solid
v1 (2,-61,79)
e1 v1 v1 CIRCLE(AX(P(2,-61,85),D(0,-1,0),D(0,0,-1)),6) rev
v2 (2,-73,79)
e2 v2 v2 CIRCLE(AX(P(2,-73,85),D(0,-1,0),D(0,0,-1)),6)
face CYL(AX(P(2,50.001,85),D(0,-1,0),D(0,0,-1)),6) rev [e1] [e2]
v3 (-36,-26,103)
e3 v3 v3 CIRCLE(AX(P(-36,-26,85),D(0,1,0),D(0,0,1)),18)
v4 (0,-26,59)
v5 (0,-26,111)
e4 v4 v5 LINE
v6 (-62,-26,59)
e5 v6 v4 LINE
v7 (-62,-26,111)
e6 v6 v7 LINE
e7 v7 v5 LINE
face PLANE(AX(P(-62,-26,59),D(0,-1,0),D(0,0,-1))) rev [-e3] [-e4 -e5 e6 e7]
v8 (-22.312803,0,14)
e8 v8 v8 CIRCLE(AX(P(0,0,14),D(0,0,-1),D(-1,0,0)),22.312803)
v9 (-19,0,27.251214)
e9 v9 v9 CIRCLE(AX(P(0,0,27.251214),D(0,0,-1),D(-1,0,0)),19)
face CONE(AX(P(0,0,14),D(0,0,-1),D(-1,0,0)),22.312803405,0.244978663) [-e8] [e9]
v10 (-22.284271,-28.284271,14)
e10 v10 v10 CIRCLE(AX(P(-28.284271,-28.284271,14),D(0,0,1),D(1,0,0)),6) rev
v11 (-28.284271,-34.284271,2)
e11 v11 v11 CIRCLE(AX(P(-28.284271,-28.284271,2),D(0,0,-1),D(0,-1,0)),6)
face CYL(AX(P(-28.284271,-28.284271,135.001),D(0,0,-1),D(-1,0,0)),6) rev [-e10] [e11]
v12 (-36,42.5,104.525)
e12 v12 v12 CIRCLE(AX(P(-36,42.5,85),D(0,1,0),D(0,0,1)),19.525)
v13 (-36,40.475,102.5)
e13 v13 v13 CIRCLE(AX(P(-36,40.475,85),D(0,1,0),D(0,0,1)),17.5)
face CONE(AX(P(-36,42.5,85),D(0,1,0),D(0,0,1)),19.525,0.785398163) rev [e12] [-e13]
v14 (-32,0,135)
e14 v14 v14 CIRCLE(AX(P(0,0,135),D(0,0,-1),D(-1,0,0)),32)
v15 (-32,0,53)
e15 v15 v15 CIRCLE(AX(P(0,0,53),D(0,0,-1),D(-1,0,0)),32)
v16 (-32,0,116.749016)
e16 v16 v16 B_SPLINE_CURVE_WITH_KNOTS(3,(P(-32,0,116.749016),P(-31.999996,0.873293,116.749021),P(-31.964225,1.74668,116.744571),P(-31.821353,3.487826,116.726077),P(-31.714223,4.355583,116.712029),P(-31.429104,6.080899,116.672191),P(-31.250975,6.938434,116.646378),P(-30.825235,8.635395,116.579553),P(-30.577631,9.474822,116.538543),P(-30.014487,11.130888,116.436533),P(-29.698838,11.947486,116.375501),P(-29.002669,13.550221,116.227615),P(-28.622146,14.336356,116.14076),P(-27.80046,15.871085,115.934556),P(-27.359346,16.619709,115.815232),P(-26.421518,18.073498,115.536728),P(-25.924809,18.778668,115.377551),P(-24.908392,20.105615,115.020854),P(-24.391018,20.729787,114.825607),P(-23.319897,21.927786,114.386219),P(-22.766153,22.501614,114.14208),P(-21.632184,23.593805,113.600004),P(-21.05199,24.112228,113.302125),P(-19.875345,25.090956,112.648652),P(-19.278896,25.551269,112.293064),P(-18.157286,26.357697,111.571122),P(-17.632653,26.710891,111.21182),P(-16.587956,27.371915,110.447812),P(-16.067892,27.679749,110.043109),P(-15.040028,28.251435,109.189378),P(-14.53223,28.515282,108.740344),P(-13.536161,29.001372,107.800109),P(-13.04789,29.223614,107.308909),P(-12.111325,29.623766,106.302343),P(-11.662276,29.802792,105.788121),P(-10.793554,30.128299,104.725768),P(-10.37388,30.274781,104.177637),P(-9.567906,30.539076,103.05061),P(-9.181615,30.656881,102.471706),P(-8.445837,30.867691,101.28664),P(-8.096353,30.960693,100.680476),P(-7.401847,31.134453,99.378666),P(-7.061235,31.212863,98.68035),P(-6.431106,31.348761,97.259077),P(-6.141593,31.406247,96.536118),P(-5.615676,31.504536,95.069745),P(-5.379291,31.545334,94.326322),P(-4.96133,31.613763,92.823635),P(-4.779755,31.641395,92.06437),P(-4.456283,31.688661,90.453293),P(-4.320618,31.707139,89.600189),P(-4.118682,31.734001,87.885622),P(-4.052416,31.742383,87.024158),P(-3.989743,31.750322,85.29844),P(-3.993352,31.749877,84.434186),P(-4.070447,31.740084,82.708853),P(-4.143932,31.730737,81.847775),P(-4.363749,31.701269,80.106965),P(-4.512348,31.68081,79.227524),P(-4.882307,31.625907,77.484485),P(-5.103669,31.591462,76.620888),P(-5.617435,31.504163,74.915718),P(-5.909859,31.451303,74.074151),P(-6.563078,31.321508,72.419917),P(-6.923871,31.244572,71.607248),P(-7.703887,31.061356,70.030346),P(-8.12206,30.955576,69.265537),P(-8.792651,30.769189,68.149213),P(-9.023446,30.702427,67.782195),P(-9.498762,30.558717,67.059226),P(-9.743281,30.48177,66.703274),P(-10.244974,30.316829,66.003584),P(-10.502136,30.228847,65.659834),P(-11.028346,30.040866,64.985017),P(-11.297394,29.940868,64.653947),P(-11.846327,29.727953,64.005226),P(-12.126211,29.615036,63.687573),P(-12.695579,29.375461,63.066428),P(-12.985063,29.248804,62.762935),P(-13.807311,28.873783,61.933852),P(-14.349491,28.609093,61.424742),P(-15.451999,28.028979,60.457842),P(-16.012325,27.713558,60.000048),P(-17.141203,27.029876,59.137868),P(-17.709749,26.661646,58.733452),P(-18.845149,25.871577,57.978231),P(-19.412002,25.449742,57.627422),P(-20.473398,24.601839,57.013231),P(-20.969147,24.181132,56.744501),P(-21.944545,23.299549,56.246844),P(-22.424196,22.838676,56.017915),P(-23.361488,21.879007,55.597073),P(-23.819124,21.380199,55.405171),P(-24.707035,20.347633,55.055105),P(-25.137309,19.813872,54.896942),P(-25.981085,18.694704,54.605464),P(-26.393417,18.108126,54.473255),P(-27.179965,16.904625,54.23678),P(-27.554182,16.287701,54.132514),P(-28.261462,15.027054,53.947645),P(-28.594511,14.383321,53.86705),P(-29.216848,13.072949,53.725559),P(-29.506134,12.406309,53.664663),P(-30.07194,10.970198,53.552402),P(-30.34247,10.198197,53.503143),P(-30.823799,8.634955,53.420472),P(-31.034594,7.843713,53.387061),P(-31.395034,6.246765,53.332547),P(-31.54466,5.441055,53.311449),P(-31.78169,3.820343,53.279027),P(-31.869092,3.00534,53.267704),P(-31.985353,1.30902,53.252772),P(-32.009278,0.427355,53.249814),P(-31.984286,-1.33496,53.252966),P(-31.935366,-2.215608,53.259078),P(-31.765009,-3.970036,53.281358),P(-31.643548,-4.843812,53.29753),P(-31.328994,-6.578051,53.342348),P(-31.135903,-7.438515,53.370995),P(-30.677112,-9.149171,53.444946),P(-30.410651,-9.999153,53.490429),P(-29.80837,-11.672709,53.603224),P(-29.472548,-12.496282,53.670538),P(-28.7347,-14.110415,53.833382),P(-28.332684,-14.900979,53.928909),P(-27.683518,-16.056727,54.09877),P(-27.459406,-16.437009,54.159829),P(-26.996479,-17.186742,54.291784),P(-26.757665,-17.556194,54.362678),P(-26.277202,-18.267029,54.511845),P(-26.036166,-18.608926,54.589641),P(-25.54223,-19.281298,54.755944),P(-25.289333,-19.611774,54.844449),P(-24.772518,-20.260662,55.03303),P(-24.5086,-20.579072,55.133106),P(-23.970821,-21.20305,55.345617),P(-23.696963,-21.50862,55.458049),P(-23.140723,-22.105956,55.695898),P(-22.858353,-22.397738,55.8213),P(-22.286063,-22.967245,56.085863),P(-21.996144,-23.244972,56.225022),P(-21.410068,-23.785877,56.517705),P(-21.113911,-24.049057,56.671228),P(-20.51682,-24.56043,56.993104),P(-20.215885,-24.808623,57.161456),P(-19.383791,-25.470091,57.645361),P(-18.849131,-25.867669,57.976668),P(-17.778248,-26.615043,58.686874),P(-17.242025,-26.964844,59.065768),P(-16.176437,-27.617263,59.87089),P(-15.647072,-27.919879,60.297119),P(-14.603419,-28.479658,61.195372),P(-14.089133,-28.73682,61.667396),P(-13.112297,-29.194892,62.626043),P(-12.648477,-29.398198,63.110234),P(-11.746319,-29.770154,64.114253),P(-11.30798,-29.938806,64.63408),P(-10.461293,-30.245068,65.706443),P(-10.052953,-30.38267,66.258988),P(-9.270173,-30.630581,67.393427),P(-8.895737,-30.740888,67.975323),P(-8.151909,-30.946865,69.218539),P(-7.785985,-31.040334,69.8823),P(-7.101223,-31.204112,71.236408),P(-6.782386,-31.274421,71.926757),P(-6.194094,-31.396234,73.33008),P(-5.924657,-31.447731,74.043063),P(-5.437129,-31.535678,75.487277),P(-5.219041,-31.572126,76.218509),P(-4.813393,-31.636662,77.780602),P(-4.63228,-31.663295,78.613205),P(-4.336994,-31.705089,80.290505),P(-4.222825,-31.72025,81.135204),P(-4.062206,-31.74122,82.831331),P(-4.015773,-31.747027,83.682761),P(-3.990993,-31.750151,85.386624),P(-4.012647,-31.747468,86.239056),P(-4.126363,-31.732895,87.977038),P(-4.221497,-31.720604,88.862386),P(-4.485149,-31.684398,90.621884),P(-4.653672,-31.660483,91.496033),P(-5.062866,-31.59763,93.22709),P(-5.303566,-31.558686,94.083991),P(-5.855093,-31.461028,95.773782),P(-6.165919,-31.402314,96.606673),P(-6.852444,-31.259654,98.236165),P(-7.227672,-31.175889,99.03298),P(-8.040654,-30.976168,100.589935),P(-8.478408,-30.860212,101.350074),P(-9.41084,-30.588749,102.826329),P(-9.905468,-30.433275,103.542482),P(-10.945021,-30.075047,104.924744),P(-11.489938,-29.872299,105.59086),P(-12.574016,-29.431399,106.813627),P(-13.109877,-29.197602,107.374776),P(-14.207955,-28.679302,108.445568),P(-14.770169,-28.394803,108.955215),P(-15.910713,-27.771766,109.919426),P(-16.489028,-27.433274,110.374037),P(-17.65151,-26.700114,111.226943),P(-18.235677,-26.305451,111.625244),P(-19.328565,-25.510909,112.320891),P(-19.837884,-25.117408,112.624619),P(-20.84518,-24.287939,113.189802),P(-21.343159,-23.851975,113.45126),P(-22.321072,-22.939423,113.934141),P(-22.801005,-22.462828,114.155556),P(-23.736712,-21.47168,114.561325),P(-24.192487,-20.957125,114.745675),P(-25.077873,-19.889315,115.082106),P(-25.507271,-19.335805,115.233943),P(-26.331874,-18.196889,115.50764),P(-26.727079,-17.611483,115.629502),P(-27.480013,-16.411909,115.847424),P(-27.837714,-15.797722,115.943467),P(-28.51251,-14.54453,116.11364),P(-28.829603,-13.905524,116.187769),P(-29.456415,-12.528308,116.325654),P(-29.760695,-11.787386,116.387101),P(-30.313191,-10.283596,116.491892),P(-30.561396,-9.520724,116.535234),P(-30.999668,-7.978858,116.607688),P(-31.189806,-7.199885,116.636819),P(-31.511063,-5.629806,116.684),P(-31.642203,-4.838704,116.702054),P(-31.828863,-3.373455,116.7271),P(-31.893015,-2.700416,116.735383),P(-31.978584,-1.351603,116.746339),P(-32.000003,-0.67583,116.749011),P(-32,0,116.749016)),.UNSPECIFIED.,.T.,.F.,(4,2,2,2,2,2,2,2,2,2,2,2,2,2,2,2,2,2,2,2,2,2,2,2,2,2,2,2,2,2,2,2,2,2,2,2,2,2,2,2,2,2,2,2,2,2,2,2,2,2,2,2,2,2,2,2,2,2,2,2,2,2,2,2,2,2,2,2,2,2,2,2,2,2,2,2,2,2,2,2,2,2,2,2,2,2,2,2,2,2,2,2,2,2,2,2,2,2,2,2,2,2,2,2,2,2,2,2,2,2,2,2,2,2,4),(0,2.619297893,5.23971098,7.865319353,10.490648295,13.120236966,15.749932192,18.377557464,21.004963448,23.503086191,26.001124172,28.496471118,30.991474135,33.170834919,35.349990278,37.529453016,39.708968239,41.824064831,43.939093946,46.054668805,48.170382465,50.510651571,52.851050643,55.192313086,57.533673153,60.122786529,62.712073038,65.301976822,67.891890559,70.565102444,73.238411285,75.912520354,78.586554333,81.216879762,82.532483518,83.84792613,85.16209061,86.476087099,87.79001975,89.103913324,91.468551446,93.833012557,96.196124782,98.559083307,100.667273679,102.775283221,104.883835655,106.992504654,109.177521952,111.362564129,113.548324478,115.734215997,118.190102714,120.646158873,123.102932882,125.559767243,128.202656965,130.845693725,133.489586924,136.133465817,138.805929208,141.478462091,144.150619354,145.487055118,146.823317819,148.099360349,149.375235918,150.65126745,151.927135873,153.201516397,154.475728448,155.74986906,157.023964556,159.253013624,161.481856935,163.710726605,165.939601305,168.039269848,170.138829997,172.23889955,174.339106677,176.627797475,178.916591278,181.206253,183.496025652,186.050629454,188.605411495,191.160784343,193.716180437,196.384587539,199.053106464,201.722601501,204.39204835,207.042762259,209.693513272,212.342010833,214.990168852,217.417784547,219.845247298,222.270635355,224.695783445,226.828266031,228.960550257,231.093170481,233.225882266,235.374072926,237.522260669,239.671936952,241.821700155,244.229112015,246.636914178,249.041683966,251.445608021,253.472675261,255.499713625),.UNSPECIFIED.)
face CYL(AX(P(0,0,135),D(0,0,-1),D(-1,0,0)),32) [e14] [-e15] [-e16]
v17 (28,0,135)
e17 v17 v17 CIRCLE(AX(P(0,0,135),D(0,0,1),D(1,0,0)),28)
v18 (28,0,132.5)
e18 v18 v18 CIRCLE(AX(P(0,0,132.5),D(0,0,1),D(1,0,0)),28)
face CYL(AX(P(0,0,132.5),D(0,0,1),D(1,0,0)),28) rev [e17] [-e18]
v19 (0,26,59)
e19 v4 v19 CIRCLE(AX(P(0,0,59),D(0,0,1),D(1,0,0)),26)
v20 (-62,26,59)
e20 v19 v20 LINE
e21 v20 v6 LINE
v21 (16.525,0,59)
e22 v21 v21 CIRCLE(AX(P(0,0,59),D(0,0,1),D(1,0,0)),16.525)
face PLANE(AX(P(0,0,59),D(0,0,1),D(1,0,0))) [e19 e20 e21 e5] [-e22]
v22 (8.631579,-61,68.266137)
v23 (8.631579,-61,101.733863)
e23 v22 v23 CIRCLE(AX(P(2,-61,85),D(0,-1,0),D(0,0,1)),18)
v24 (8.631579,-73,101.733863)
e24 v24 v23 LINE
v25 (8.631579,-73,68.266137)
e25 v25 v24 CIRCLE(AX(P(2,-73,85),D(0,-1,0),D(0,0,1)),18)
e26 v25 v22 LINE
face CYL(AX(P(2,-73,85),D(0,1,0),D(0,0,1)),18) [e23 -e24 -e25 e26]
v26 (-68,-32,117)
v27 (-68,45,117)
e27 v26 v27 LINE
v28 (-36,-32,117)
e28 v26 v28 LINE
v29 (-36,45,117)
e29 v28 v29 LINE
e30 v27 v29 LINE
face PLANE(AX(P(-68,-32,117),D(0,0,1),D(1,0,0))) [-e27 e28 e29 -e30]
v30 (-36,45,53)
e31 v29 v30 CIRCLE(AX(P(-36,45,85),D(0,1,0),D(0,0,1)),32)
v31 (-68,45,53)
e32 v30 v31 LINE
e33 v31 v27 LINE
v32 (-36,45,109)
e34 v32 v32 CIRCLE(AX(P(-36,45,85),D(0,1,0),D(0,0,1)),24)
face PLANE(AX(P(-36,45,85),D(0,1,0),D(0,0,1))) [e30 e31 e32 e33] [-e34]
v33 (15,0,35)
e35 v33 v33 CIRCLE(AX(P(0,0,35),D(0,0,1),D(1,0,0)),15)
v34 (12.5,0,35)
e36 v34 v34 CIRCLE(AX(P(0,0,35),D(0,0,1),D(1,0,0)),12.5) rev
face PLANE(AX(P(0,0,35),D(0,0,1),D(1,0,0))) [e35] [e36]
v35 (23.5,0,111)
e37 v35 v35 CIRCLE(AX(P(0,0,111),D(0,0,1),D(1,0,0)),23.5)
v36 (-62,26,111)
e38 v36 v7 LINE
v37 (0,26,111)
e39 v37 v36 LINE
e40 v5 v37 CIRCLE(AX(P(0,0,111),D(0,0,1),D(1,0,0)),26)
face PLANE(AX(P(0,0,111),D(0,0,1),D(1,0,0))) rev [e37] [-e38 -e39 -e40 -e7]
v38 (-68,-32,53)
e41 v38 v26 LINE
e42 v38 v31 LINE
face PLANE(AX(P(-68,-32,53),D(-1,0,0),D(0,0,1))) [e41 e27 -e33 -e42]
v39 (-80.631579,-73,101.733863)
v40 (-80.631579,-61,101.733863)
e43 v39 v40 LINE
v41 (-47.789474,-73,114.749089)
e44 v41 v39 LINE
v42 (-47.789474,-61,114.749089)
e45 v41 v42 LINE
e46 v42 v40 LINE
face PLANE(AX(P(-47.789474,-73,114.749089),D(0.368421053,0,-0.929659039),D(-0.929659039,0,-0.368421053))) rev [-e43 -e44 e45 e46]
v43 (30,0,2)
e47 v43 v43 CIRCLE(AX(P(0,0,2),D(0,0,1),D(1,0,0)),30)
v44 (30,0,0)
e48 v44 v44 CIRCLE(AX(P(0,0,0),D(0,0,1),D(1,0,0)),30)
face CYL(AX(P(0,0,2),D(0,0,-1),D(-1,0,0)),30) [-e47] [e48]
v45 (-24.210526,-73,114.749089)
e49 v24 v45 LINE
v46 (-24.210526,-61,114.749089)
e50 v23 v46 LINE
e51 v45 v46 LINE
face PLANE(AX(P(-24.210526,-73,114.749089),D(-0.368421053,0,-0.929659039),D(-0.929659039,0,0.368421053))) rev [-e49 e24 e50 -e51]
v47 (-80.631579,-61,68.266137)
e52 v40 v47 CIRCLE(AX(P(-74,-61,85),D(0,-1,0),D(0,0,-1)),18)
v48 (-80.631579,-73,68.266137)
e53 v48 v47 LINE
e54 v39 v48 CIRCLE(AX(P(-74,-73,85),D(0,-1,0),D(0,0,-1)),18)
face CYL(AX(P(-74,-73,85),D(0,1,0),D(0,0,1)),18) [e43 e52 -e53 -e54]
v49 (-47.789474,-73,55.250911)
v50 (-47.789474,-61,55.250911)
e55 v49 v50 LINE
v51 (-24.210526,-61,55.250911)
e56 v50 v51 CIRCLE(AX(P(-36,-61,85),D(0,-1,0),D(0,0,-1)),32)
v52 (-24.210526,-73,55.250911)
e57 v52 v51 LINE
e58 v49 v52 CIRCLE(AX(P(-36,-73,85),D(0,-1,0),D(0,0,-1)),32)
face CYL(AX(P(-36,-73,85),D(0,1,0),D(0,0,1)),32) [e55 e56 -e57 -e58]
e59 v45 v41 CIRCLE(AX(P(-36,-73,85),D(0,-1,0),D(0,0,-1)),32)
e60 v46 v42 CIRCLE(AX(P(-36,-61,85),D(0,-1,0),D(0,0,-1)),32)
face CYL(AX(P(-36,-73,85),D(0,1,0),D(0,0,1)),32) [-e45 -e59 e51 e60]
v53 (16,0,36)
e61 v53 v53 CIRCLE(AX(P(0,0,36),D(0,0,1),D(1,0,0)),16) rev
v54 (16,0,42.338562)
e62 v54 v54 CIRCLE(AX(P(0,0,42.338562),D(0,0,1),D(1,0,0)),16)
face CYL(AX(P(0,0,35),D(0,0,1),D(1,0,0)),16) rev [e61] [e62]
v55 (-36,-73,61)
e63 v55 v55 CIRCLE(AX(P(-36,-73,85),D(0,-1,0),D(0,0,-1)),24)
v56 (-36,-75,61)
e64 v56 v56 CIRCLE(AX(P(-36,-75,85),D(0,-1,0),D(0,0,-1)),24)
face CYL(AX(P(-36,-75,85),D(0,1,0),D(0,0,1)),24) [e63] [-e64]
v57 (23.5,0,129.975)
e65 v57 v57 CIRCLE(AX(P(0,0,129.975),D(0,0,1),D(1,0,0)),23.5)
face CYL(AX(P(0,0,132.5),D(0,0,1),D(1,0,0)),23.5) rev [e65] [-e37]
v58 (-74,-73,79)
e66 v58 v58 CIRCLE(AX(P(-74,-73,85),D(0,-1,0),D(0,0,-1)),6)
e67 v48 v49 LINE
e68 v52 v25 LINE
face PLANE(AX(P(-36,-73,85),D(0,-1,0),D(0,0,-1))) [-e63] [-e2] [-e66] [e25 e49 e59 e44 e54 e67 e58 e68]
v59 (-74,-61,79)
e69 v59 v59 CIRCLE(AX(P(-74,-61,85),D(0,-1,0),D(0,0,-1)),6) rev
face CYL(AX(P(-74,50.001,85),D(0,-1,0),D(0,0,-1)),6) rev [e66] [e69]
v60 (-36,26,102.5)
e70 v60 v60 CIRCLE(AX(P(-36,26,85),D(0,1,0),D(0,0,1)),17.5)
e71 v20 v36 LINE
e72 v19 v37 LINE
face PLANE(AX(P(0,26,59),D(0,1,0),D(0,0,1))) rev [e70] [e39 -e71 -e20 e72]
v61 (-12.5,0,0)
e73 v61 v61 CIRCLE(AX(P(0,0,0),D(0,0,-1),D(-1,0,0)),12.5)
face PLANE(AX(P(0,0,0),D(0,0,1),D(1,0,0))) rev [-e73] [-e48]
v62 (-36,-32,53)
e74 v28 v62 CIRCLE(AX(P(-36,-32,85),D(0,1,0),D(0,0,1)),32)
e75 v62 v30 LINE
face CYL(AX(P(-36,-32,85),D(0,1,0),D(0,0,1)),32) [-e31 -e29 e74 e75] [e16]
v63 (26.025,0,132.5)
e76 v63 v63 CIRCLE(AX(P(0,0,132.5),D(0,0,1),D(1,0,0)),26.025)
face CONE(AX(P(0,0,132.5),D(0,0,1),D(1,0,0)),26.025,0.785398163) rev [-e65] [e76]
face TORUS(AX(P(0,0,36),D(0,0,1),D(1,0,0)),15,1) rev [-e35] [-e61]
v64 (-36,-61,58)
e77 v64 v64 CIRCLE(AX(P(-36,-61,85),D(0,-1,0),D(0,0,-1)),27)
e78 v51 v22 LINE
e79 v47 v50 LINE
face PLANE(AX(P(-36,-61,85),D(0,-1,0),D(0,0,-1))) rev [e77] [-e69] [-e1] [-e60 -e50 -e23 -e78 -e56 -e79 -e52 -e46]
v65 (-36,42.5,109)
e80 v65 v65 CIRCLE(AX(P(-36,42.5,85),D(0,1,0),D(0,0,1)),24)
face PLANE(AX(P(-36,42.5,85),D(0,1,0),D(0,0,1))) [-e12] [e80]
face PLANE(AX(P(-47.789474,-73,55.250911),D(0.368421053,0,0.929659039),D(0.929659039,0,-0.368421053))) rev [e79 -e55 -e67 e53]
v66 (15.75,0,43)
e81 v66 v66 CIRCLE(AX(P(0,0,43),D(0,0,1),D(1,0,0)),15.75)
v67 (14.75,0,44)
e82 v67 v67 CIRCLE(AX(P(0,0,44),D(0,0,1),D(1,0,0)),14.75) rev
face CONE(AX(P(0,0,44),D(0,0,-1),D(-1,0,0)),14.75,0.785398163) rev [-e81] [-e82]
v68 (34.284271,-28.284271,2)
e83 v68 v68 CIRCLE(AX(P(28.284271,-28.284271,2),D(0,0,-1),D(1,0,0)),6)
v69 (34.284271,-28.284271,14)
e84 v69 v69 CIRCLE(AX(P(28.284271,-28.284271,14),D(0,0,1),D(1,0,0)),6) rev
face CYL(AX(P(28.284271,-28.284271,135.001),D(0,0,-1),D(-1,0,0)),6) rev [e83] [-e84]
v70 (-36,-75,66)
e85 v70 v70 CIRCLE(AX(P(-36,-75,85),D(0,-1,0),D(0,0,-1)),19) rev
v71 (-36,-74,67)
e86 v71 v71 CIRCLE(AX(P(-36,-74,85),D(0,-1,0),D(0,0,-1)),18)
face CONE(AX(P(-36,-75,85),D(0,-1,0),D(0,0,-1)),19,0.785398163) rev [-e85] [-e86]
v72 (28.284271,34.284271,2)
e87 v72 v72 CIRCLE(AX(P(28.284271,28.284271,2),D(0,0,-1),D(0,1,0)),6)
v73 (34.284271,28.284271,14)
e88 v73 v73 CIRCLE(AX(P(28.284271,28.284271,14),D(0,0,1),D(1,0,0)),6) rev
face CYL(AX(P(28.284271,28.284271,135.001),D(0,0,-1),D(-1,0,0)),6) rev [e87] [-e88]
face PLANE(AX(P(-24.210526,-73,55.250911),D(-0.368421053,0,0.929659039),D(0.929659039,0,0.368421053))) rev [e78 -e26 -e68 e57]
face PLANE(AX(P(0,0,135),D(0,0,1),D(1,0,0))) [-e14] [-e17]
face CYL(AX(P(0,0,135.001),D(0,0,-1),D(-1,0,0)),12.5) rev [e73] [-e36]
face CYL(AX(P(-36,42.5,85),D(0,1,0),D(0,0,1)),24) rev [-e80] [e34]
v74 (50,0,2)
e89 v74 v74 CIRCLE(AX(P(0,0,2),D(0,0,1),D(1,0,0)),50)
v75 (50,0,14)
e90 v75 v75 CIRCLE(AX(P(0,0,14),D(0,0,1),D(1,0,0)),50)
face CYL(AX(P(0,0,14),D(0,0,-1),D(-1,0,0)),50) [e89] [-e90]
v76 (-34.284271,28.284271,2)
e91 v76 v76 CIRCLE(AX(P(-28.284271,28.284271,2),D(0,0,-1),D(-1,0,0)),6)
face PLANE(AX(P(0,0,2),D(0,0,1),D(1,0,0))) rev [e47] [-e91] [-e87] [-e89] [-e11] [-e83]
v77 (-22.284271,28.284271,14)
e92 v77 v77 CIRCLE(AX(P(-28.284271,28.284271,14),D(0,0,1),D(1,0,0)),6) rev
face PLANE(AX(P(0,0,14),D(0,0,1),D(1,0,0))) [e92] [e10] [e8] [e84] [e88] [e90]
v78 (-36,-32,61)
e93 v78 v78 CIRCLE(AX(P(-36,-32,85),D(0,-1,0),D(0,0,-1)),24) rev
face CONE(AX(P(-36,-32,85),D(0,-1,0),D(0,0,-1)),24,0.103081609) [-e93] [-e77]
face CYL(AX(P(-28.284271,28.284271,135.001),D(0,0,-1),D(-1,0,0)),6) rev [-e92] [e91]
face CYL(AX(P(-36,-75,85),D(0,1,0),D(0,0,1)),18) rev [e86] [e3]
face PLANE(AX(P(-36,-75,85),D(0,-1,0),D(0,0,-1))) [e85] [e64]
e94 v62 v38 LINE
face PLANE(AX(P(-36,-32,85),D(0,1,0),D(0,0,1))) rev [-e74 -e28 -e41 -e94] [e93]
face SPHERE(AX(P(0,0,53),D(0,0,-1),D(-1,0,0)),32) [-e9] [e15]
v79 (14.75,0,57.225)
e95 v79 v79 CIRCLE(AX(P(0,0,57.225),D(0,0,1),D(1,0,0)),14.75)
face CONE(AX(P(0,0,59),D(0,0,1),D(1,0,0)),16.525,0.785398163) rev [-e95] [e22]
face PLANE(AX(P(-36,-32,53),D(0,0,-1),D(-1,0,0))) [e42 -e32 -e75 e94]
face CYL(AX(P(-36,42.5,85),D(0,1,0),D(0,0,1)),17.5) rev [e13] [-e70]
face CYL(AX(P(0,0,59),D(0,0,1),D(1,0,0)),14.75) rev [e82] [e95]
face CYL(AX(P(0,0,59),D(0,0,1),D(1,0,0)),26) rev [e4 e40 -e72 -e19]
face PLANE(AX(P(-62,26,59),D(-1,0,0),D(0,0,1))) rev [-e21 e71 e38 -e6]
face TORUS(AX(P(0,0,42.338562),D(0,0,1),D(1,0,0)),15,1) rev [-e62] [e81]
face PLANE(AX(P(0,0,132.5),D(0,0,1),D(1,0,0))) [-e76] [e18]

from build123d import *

# Parameters (mm, degrees)
SKETCH_1_R                    = 30
EXTRUDE_1_DEPTH               = 2
SKETCH_2_R                    = 50
EXTRUDE_2_DEPTH               = 12
EXTRUDE_4_DEPTH               = 45
EXTRUDE_4_DEPTH_BACK          = 32
EXTRUDE_START                 = 12
EXTRUDE_5_DEPTH               = 12
SKETCH_9_R                    = 24
EXTRUDE_6_DEPTH               = 2
CUT_EXTRUDE_1_DEPTH           = 26
SKETCH_11_R                   = 28
CUT_EXTRUDE_2_DEPTH           = 2.5
CUT_EXTRUDE_3_REACH           = 181.761
SKETCH_14_R                   = 12.5
CUT_EXTRUDE_START             = -16
SKETCH_15_R                   = 16
CUT_EXTRUDE_4_DEPTH           = 8
HOLE_WIZARD_M33_1_D           = 29.5
HOLE_WIZARD_M33_1_DEPTH       = 16
HOLE_WIZARD_M33_1_CSINK_D     = 33.05
HOLE_WIZARD_M33_1_CSINK_ANGLE = 90
HOLE_WIZARD_M33_1_TIP         = 8.862694131
CHAMFER_1_SIZE                = 1
FILLET_1_R                    = 1
SKETCH_19_R                   = 24
CUT_EXTRUDE_5_DEPTH           = 2.5
SKETCH_22_R                   = 18
CUT_EXTRUDE_6_DEPTH           = 181.180465165
CHAMFER_2_SIZE                = 1
CUT_EXTRUDE_7_REACH           = 206.494
SKETCH_23_R                   = 6
CUT_EXTRUDE_8_REACH           = 180.264
SKETCH_24_R                   = 6
PATTERN_CIRCULAR_1_COUNT      = 4


# Read off the part's stored shape, not the designer's step: 边界1
with BuildPart() as part:
    # 草图1 → 凸台-拉伸1 (new body)
    with BuildSketch(Plane.XY):
        Circle(SKETCH_1_R)
    extrude(amount=EXTRUDE_1_DEPTH)

    # 草图2 → 凸台-拉伸2 (add)
    with BuildSketch(Plane.XY.offset(2)):
        Circle(SKETCH_2_R)
    extrude(amount=EXTRUDE_2_DEPTH)

    # 草图3 → 旋转1 (revolve)
    with BuildSketch(Plane(origin=(0, 0, 0), x_dir=(1, 0, 0), z_dir=(0, 1, 0))):
        with BuildLine():
            Line((0, -53), (0, -14))
            Line((0, -14), (-22.312803405, -14))
            Line((-22.312803405, -14), (-19, -27.251213621))
            ThreePointArc((-19, -27.251213621), (-28.565713714, -38.577794898), (-32, -53))
            Line((-32, -53), (-32, -135))
            Line((-32, -135), (0, -135))
            Line((0, -135), (0, -53))
        make_face()
    revolve(axis=Axis((0, 0, 135), (0, 0, 1)))

    # 草图5 → 凸台-拉伸4 (add, two sides: drawn at the far end of the back side and taken through both)
    with BuildSketch(Plane(origin=(0, 0, 0), x_dir=(1, 0, 0), z_dir=(0, 1, 0)).offset(-EXTRUDE_4_DEPTH_BACK)):
        with BuildLine():
            Line((-36, -53), (-68, -53))
            Line((-68, -53), (-68, -117))
            Line((-68, -117), (-36, -117))
            ThreePointArc((-36, -117), (-4, -85), (-36, -53))
        make_face()
    extrude(amount=EXTRUDE_4_DEPTH + EXTRUDE_4_DEPTH_BACK)

    # 边界1 outline → 边界1 (revolve)
    with BuildSketch(Plane(origin=(-36, 0, 85), x_dir=(1, 0, 0), z_dir=(0, 0, 1))):
        Polygon((0, -61), (27, -61), (24, -32), (0, -32), align=None)
    revolve(axis=Axis((-36, 0, 85), (0, 1, 0)))

    # 草图8 → 凸台-拉伸5 (add)
    with BuildSketch(Plane(origin=(0, -61, 0), x_dir=(-1, 0, 0), z_dir=(0, -1, 0)).offset(EXTRUDE_START)):
        with BuildLine():
            Line((47.789473684, -55.250910766), (80.631578947, -68.266137306))
            ThreePointArc((80.631578947, -68.266137306), (92, -85), (80.631578947, -101.733862694))
            Line((80.631578947, -101.733862694), (47.789473684, -114.749089234))
            ThreePointArc((47.789473684, -114.749089234), (36, -117), (24.210526316, -114.749089234))
            Line((24.210526316, -114.749089234), (-8.631578947, -101.733862694))
            ThreePointArc((-8.631578947, -101.733862694), (-20, -85), (-8.631578947, -68.266137306))
            Line((-8.631578947, -68.266137306), (24.210526316, -55.250910766))
            ThreePointArc((24.210526316, -55.250910766), (36, -53), (47.789473684, -55.250910766))
        make_face()
    extrude(amount=-EXTRUDE_5_DEPTH)

    # 草图9 → 凸台-拉伸6 (add)
    with BuildSketch(Plane.XZ.offset(73)):
        with Locations(Location((-36, 85, 0), (0, 0, 270))):
            Circle(SKETCH_9_R)
    extrude(amount=EXTRUDE_6_DEPTH)

    # 草图10 → 切除-拉伸1 (cut, symmetric)
    with BuildSketch(Plane.XY.offset(85)):
        with BuildLine():
            Line((0, 26), (-62, 26))
            Line((-62, 26), (-62, -26))
            Line((-62, -26), (0, -26))
            ThreePointArc((0, -26), (26, 0), (0, 26))
        make_face()
    extrude(amount=CUT_EXTRUDE_1_DEPTH, both=True, mode=Mode.SUBTRACT)

    # 草图11 → 切除-拉伸2 (cut)
    with BuildSketch(Plane.XY.offset(135)):
        Circle(SKETCH_11_R)
    extrude(amount=-CUT_EXTRUDE_2_DEPTH, mode=Mode.SUBTRACT)

    # 草图13 → M52x5.0 螺纹孔1 (revolve, cut)
    with BuildSketch(Plane(origin=(0, 0, 132.5), x_dir=(0, -1, 0), z_dir=(1, 0, 0))):
        Polygon((0, 0), (0, 21.5), (23.5, 21.5), (23.5, 2.525), (26.025, 0), align=None)
    revolve(axis=Axis((0, 0, 138.85), (0, 0, -1)), mode=Mode.SUBTRACT)

    # 草图14 → 切除-拉伸3 (cut, up to next)
    with BuildSketch(Plane(origin=(0, 0, 0), x_dir=(-1, 0, 0), z_dir=(0, 0, -1)), mode=Mode.PRIVATE) as cut_extrude_3_sk1:
        Circle(SKETCH_14_R)
    cut_extrude_3_tool1 = extrude(cut_extrude_3_sk1.sketch, amount=-CUT_EXTRUDE_3_REACH, mode=Mode.PRIVATE) & part.part
    add(cut_extrude_3_tool1.solids().sort_by_distance((0, 0, 0))[0], mode=Mode.SUBTRACT)

    # 草图15 → 切除-拉伸4 (cut)
    with BuildSketch(Plane.XY.offset(59).offset(CUT_EXTRUDE_START)):
        Circle(SKETCH_15_R)
    extrude(amount=-CUT_EXTRUDE_4_DEPTH, mode=Mode.SUBTRACT)

    # M33 螺纹孔1
    with Locations(Plane.XY.offset(59)):
        with Locations((0, 0)):
            CounterSinkHole(HOLE_WIZARD_M33_1_D / 2, HOLE_WIZARD_M33_1_CSINK_D / 2, depth=HOLE_WIZARD_M33_1_DEPTH, counter_sink_angle=HOLE_WIZARD_M33_1_CSINK_ANGLE)
            with Locations((0, 0, -(HOLE_WIZARD_M33_1_DEPTH + HOLE_WIZARD_M33_1_TIP / 2))):  # 118° drill point
                Cone(0, HOLE_WIZARD_M33_1_D / 2, HOLE_WIZARD_M33_1_TIP, mode=Mode.SUBTRACT)

    # 倒角1
    chamfer_1_edges = [part.edges().sort_by_distance(p)[0] for p in [
        (14.75, 0, 43),
    ]]
    chamfer(chamfer_1_edges, length=CHAMFER_1_SIZE)

    # 圆角1
    # the kernel refuses this fillet: 1 mm, written as the material it adds along each edge
    with BuildSketch(Plane(origin=(0, 0, 43), x_dir=(1, 0, 0), z_dir=(0, -1, 0))) as fillet_1_piece_1:
        with BuildLine():
            CenterArc((15, -0.661437828), FILLET_1_R, 0, 41.409622109)
            Line((16, -0.661437828), (16.02, -0.661437828))
            Line((16.02, -0.661437828), (16.02, 0))
            Line((16.02, 0), (16, 0.02))
            ThreePointArc((16, 0.02), (15.875, 0.02), (15.765, 0.013228757))
            Line((15.765, 0.013228757), (15.75, 0))
        make_face()
    revolve(axis=Axis((0, 0, 43), (0, 0, 1)))
    with BuildSketch(Plane(origin=(0, 0, 35), x_dir=(1, 0, 0), z_dir=(0, -1, 0))) as fillet_1_piece_2:
        with BuildLine():
            CenterArc((16 - FILLET_1_R, FILLET_1_R), FILLET_1_R, 270, 90)
            Line((16 - FILLET_1_R, 0), (16 - FILLET_1_R, -FILLET_1_R * 0.02))
            Line((16 - FILLET_1_R, -FILLET_1_R * 0.02), (16 + FILLET_1_R * 0.02, -FILLET_1_R * 0.02))
            Line((16 + FILLET_1_R * 0.02, -FILLET_1_R * 0.02), (16 + FILLET_1_R * 0.02, FILLET_1_R))
            Line((16 + FILLET_1_R * 0.02, FILLET_1_R), (16, FILLET_1_R))
        make_face()
    revolve(axis=Axis((0, 0, 35), (0, 0, 1)))

    # 草图19 → 切除-拉伸5 (cut)
    with BuildSketch(Plane(origin=(0, 45, 0), x_dir=(1, 0, 0), z_dir=(0, 1, 0))):
        with Locations(Location((-36, -85, 0), (0, 0, 90))):
            Circle(SKETCH_19_R)
    extrude(amount=-CUT_EXTRUDE_5_DEPTH, mode=Mode.SUBTRACT)

    # 草图21 → M39 螺纹孔1 (revolve, cut)
    with BuildSketch(Plane(origin=(-36, 42.5, 85), x_dir=(0, 0, 1), z_dir=(1, 0, 0))):
        Polygon((0, 0), (0, 16.5), (17.5, 16.5), (17.5, 2.025), (19.525, 0), align=None)
    revolve(axis=Axis((-36, 48.85, 85), (0, -1, 0)), mode=Mode.SUBTRACT)

    # 草图22 → 切除-拉伸6 (cut, through all)
    with BuildSketch(Plane(origin=(0, -26, 0), x_dir=(1, 0, 0), z_dir=(0, 1, 0))):
        with Locations(Location((-36, -85, 0), (0, 0, 270))):
            Circle(SKETCH_22_R)
    extrude(amount=-CUT_EXTRUDE_6_DEPTH, mode=Mode.SUBTRACT)

    # 倒角2
    chamfer_2_edges = [part.edges().sort_by_distance(p)[0] for p in [
        (-36, -75, 67),
    ]]
    chamfer(chamfer_2_edges, length=CHAMFER_2_SIZE)

    # 草图23 → 切除-拉伸7 (cut, up to next)
    with BuildSketch(Plane.XZ.offset(73), mode=Mode.PRIVATE) as cut_extrude_7_sk1:
        with Locations(Location((-74, 85, 0), (0, 0, 270))):
            Circle(SKETCH_23_R)
    cut_extrude_7_tool1 = extrude(cut_extrude_7_sk1.sketch, amount=-CUT_EXTRUDE_7_REACH, mode=Mode.PRIVATE) & part.part
    # 草图23 → 切除-拉伸7 (cut, up to next)
    with BuildSketch(Plane.XZ.offset(73), mode=Mode.PRIVATE) as cut_extrude_7_sk2:
        with Locations(Location((2, 85, 0), (0, 0, 270))):
            Circle(SKETCH_23_R)
    cut_extrude_7_tool2 = extrude(cut_extrude_7_sk2.sketch, amount=-CUT_EXTRUDE_7_REACH, mode=Mode.PRIVATE) & part.part
    add(cut_extrude_7_tool1.solids().sort_by_distance((-74, -73, 85))[0], mode=Mode.SUBTRACT)
    add(cut_extrude_7_tool2.solids().sort_by_distance((2, -73, 85))[0], mode=Mode.SUBTRACT)

    # 草图24 → 切除-拉伸8 (cut, up to next)
    with BuildSketch(Plane(origin=(0, 0, 2), x_dir=(-1, 0, 0), z_dir=(0, 0, -1)), mode=Mode.PRIVATE) as cut_extrude_8_sk1:
        with Locations((28.284271247, 28.284271247)):
            Circle(SKETCH_24_R)
    cut_extrude_8_tool1 = extrude(cut_extrude_8_sk1.sketch, amount=-CUT_EXTRUDE_8_REACH, mode=Mode.PRIVATE) & part.part
    cut_extrude_8 = cut_extrude_8_tool1.solids().sort_by_distance((-28.284271, 28.284271, 2))[0]
    add(cut_extrude_8, mode=Mode.SUBTRACT)

    # 阵列(圆周)1: 切除-拉伸8 ×4 about axis
    pattern_circular_1_axis = Axis((0, 0, 0), (0, 0, 1))
    for i in range(1, PATTERN_CIRCULAR_1_COUNT):
        add(cut_extrude_8.rotate(pattern_circular_1_axis, i * 360 / PATTERN_CIRCULAR_1_COUNT), mode=Mode.SUBTRACT)


solid = part.part
